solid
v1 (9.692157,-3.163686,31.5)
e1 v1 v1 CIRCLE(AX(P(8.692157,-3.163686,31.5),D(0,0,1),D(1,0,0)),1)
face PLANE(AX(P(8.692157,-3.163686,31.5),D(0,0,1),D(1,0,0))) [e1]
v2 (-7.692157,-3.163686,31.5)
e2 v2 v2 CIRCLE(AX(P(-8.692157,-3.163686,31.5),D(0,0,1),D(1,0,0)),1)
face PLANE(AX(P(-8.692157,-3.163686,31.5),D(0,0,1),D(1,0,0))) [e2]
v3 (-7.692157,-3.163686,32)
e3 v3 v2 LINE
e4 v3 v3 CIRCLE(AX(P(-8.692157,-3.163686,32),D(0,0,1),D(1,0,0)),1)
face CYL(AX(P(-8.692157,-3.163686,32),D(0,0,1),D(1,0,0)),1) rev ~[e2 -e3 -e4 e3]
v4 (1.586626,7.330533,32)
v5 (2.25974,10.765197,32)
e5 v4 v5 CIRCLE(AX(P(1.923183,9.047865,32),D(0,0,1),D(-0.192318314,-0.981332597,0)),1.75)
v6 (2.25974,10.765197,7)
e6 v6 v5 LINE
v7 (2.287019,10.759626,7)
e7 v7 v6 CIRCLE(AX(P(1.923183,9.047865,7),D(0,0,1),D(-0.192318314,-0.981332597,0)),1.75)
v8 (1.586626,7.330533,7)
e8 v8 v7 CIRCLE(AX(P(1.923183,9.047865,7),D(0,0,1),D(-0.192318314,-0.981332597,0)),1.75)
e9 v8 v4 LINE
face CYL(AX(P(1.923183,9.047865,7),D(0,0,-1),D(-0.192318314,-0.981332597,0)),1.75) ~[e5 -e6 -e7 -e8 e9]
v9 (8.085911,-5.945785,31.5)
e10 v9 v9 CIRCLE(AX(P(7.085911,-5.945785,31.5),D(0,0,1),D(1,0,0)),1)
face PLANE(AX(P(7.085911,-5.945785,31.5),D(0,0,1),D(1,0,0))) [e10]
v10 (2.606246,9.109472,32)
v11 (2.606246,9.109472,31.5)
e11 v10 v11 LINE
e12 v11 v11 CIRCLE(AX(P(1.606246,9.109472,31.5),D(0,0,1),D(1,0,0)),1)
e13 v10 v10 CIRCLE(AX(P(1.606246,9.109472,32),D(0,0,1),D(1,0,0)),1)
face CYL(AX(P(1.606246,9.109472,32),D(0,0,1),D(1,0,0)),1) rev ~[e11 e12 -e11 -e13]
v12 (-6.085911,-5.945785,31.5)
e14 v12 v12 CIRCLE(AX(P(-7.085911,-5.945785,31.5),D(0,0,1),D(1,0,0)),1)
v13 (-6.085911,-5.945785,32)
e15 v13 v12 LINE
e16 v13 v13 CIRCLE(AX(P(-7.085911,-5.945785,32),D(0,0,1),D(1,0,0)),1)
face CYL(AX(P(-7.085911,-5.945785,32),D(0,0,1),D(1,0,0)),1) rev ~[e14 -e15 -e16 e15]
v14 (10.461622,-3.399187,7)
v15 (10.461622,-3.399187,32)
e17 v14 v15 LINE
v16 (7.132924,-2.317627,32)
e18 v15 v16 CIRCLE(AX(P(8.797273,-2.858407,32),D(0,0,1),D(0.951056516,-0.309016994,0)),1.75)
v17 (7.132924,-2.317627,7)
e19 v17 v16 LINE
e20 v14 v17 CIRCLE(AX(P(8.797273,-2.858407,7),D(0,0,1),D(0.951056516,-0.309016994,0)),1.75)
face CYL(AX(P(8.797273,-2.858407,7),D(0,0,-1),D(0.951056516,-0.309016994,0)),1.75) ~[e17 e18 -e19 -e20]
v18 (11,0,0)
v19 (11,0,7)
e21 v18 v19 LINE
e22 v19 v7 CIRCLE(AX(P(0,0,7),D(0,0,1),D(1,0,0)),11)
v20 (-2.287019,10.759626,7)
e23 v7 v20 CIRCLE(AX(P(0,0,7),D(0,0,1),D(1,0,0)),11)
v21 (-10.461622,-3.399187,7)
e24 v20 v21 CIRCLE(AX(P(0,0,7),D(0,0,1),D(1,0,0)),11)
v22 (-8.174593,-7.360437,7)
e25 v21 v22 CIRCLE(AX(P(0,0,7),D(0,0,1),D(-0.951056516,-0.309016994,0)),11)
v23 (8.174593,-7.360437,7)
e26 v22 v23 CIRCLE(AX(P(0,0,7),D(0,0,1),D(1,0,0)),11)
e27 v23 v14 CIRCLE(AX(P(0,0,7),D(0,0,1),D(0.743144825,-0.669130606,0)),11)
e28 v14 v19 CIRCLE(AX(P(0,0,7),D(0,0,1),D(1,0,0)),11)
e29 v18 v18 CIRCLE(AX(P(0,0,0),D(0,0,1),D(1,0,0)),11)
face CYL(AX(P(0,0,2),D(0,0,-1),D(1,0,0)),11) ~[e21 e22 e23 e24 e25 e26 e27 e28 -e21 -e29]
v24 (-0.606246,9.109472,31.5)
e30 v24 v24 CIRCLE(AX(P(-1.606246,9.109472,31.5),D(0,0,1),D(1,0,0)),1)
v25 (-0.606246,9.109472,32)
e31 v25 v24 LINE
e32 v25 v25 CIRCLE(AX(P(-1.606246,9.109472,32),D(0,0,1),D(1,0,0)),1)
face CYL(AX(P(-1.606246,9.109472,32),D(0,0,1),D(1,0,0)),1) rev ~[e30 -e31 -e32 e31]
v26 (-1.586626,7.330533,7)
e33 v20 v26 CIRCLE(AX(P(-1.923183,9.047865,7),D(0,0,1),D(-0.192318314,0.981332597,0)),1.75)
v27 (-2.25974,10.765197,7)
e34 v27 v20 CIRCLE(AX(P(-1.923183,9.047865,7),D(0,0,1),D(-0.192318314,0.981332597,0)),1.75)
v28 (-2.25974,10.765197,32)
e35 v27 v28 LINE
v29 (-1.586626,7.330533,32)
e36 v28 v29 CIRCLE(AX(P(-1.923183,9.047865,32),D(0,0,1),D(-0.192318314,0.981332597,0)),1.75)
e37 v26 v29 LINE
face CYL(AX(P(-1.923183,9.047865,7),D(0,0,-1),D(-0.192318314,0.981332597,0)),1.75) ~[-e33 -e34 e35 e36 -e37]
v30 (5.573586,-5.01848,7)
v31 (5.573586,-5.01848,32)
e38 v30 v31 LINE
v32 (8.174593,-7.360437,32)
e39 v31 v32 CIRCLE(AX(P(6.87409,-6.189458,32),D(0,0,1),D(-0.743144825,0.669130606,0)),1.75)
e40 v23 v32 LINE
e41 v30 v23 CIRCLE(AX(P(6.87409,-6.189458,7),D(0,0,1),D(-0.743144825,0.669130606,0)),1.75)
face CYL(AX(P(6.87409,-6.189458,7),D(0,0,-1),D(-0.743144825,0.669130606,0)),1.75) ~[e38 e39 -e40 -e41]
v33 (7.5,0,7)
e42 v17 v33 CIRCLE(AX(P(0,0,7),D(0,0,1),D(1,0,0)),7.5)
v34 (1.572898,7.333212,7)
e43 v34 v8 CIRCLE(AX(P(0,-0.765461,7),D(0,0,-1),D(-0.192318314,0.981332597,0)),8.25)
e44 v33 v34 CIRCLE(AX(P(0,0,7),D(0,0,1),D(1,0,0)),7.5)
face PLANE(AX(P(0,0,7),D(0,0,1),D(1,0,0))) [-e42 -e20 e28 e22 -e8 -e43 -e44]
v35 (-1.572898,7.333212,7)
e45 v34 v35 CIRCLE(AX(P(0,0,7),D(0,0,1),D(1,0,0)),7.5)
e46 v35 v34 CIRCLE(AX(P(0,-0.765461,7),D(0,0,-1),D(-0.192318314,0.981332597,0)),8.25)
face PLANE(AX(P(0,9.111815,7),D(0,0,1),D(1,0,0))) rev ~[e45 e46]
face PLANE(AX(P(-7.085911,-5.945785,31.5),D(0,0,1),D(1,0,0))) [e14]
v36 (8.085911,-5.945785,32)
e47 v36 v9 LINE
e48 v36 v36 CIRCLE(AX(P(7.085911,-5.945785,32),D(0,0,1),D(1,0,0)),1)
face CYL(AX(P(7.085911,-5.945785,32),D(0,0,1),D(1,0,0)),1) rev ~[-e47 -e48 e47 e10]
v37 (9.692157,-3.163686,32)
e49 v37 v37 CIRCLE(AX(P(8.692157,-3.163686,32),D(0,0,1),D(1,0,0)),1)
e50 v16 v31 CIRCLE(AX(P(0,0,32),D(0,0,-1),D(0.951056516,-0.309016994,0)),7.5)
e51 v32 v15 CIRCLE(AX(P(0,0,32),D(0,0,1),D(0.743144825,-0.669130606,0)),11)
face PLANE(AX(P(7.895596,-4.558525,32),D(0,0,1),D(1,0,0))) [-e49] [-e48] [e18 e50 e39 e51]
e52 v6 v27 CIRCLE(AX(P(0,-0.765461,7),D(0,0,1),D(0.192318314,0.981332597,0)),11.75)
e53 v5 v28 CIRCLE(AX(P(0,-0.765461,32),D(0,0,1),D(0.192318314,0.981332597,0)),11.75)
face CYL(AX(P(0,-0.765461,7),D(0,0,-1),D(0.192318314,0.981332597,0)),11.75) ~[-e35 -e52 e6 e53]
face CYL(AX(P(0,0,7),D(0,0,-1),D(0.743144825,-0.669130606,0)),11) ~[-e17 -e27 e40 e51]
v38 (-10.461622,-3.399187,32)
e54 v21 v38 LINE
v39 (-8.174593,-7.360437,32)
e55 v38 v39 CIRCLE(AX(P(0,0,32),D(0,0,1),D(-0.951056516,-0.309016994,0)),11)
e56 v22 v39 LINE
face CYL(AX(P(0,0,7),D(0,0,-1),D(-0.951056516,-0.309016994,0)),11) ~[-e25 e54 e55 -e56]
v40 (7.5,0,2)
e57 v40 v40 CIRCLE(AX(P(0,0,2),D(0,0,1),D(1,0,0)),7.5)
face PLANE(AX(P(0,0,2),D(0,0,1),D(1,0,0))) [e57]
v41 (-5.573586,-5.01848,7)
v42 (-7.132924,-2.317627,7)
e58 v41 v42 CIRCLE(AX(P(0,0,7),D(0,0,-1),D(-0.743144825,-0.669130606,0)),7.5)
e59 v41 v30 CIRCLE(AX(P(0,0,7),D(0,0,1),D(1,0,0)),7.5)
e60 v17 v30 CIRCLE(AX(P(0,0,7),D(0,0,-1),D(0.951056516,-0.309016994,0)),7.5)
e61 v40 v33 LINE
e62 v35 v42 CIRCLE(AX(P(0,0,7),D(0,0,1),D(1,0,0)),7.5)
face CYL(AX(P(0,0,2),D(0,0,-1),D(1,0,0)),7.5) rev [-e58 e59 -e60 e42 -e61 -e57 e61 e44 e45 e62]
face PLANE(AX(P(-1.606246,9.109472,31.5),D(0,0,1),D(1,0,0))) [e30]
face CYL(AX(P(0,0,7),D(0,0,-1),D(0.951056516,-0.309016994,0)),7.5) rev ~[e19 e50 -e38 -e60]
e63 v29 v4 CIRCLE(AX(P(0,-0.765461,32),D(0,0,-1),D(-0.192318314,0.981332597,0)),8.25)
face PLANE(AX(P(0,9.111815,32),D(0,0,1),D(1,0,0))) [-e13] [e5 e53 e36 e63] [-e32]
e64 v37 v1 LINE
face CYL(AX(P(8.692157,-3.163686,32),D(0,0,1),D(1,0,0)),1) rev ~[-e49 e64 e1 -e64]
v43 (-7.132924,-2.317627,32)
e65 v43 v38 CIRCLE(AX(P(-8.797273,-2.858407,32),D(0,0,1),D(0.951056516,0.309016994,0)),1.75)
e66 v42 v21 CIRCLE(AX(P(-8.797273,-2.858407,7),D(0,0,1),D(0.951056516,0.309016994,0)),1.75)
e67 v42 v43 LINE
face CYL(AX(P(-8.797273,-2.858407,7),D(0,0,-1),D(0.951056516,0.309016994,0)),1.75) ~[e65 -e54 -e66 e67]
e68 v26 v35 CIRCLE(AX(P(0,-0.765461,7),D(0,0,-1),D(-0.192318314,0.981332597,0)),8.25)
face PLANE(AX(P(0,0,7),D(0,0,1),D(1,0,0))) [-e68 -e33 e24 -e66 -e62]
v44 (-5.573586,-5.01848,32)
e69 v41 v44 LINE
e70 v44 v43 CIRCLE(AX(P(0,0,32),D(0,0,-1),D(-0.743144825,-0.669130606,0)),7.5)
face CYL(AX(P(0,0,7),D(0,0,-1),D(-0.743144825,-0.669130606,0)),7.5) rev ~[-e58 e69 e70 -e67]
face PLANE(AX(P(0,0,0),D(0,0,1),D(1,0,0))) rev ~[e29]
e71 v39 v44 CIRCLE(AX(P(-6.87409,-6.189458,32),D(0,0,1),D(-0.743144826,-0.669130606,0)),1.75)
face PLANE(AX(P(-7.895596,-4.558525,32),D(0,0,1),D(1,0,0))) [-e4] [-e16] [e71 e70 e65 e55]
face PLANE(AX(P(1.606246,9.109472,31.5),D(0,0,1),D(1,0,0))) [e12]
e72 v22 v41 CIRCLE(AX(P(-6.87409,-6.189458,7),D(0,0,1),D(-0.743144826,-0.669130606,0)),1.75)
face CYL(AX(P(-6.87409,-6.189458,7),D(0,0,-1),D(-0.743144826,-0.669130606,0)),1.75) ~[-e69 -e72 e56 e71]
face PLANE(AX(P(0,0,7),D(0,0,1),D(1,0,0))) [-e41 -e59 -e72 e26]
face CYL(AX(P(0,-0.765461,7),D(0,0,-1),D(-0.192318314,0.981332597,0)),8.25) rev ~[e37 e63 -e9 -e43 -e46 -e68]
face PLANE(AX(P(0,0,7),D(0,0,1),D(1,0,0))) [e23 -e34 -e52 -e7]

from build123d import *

# Parameters (mm, degrees)
F0_R     = 11
F1_DEPTH = 2
F2_R     = 11
F2_R_2   = 7.5
F3_DEPTH = 5
F5_DEPTH = 25
F6_R     = 1
F7_DEPTH = 0.5


# Not quite as in the source:
# - after a boolean that leaves OpenCascade's solid faulty, fix() repairs it


with BuildPart() as f1:
    # F0 (on Top) → F1 (new body)
    with BuildSketch(Plane.XY):
        Circle(F0_R)
    extrude(amount=F1_DEPTH)

    # F2 (on face) → F3 (join)
    with BuildSketch(Plane.XY.offset(2)):
        Circle(F2_R)
        Circle(F2_R_2, mode=Mode.SUBTRACT)
    extrude(amount=F3_DEPTH)

    # F4 (on face) → F5 (join)
    with BuildSketch(Plane.XY.offset(7)):
        with BuildLine():
            ThreePointArc((1.5866260906, 7.3305332619), (3.640515185, 8.7113082573), (2.2597401896, 10.7651973517))
            ThreePointArc((2.2597401896, 10.7651973517), (0, 10.984539336), (-2.2597401896, 10.7651973517))
            ThreePointArc((-2.2597401896, 10.7651973517), (-3.640515185, 8.7113082573), (-1.5866260906, 7.3305332619))
            ThreePointArc((-1.5866260906, 7.3305332619), (0, 7.484539336), (1.5866260906, 7.3305332619))
        make_face()
        with BuildLine():
            ThreePointArc((5.5735861911, -5.0184795477), (5.7031110745, -7.4899615534), (8.1745930803, -7.3604366699))
            ThreePointArc((8.1745930803, -7.3604366699), (9.5262794416, -5.5), (10.4616216792, -3.3991869381))
            ThreePointArc((10.4616216792, -3.3991869381), (9.3380525159, -1.1940582945), (7.1329238722, -2.3176274578))
            ThreePointArc((7.1329238722, -2.3176274578), (6.4951905284, -3.75), (5.5735861911, -5.0184795477))
        make_face()
        with BuildLine():
            ThreePointArc((-7.1329238722, -2.3176274578), (-9.3380525159, -1.1940582945), (-10.4616216792, -3.3991869381))
            ThreePointArc((-10.4616216792, -3.3991869381), (-9.5262794416, -5.5), (-8.1745930803, -7.3604366699))
            ThreePointArc((-8.1745930803, -7.3604366699), (-5.7031110745, -7.4899615534), (-5.5735861911, -5.0184795477))
            ThreePointArc((-5.5735861911, -5.0184795477), (-6.4951905284, -3.75), (-7.1329238722, -2.3176274578))
        make_face()
    extrude(amount=F5_DEPTH)

    add(f1.part.fix(), mode=Mode.REPLACE)

    # F6 (on face) → F7 (cut)
    with BuildSketch(Plane.XY.offset(32)):
        with Locations((-1.6062456434, 9.1094717154)):
            Circle(F6_R)
        with Locations((-7.0859110989, -5.9457853896)):
            Circle(F6_R)
        with Locations((1.6062456434, 9.1094717154)):
            Circle(F6_R)
        with Locations((-8.6921567423, -3.1636863258)):
            Circle(F6_R)
        with Locations((8.6921567423, -3.1636863258)):
            Circle(F6_R)
        with Locations((7.0859110989, -5.9457853896)):
            Circle(F6_R)
    extrude(amount=-F7_DEPTH, mode=Mode.SUBTRACT)


solid = f1.part
